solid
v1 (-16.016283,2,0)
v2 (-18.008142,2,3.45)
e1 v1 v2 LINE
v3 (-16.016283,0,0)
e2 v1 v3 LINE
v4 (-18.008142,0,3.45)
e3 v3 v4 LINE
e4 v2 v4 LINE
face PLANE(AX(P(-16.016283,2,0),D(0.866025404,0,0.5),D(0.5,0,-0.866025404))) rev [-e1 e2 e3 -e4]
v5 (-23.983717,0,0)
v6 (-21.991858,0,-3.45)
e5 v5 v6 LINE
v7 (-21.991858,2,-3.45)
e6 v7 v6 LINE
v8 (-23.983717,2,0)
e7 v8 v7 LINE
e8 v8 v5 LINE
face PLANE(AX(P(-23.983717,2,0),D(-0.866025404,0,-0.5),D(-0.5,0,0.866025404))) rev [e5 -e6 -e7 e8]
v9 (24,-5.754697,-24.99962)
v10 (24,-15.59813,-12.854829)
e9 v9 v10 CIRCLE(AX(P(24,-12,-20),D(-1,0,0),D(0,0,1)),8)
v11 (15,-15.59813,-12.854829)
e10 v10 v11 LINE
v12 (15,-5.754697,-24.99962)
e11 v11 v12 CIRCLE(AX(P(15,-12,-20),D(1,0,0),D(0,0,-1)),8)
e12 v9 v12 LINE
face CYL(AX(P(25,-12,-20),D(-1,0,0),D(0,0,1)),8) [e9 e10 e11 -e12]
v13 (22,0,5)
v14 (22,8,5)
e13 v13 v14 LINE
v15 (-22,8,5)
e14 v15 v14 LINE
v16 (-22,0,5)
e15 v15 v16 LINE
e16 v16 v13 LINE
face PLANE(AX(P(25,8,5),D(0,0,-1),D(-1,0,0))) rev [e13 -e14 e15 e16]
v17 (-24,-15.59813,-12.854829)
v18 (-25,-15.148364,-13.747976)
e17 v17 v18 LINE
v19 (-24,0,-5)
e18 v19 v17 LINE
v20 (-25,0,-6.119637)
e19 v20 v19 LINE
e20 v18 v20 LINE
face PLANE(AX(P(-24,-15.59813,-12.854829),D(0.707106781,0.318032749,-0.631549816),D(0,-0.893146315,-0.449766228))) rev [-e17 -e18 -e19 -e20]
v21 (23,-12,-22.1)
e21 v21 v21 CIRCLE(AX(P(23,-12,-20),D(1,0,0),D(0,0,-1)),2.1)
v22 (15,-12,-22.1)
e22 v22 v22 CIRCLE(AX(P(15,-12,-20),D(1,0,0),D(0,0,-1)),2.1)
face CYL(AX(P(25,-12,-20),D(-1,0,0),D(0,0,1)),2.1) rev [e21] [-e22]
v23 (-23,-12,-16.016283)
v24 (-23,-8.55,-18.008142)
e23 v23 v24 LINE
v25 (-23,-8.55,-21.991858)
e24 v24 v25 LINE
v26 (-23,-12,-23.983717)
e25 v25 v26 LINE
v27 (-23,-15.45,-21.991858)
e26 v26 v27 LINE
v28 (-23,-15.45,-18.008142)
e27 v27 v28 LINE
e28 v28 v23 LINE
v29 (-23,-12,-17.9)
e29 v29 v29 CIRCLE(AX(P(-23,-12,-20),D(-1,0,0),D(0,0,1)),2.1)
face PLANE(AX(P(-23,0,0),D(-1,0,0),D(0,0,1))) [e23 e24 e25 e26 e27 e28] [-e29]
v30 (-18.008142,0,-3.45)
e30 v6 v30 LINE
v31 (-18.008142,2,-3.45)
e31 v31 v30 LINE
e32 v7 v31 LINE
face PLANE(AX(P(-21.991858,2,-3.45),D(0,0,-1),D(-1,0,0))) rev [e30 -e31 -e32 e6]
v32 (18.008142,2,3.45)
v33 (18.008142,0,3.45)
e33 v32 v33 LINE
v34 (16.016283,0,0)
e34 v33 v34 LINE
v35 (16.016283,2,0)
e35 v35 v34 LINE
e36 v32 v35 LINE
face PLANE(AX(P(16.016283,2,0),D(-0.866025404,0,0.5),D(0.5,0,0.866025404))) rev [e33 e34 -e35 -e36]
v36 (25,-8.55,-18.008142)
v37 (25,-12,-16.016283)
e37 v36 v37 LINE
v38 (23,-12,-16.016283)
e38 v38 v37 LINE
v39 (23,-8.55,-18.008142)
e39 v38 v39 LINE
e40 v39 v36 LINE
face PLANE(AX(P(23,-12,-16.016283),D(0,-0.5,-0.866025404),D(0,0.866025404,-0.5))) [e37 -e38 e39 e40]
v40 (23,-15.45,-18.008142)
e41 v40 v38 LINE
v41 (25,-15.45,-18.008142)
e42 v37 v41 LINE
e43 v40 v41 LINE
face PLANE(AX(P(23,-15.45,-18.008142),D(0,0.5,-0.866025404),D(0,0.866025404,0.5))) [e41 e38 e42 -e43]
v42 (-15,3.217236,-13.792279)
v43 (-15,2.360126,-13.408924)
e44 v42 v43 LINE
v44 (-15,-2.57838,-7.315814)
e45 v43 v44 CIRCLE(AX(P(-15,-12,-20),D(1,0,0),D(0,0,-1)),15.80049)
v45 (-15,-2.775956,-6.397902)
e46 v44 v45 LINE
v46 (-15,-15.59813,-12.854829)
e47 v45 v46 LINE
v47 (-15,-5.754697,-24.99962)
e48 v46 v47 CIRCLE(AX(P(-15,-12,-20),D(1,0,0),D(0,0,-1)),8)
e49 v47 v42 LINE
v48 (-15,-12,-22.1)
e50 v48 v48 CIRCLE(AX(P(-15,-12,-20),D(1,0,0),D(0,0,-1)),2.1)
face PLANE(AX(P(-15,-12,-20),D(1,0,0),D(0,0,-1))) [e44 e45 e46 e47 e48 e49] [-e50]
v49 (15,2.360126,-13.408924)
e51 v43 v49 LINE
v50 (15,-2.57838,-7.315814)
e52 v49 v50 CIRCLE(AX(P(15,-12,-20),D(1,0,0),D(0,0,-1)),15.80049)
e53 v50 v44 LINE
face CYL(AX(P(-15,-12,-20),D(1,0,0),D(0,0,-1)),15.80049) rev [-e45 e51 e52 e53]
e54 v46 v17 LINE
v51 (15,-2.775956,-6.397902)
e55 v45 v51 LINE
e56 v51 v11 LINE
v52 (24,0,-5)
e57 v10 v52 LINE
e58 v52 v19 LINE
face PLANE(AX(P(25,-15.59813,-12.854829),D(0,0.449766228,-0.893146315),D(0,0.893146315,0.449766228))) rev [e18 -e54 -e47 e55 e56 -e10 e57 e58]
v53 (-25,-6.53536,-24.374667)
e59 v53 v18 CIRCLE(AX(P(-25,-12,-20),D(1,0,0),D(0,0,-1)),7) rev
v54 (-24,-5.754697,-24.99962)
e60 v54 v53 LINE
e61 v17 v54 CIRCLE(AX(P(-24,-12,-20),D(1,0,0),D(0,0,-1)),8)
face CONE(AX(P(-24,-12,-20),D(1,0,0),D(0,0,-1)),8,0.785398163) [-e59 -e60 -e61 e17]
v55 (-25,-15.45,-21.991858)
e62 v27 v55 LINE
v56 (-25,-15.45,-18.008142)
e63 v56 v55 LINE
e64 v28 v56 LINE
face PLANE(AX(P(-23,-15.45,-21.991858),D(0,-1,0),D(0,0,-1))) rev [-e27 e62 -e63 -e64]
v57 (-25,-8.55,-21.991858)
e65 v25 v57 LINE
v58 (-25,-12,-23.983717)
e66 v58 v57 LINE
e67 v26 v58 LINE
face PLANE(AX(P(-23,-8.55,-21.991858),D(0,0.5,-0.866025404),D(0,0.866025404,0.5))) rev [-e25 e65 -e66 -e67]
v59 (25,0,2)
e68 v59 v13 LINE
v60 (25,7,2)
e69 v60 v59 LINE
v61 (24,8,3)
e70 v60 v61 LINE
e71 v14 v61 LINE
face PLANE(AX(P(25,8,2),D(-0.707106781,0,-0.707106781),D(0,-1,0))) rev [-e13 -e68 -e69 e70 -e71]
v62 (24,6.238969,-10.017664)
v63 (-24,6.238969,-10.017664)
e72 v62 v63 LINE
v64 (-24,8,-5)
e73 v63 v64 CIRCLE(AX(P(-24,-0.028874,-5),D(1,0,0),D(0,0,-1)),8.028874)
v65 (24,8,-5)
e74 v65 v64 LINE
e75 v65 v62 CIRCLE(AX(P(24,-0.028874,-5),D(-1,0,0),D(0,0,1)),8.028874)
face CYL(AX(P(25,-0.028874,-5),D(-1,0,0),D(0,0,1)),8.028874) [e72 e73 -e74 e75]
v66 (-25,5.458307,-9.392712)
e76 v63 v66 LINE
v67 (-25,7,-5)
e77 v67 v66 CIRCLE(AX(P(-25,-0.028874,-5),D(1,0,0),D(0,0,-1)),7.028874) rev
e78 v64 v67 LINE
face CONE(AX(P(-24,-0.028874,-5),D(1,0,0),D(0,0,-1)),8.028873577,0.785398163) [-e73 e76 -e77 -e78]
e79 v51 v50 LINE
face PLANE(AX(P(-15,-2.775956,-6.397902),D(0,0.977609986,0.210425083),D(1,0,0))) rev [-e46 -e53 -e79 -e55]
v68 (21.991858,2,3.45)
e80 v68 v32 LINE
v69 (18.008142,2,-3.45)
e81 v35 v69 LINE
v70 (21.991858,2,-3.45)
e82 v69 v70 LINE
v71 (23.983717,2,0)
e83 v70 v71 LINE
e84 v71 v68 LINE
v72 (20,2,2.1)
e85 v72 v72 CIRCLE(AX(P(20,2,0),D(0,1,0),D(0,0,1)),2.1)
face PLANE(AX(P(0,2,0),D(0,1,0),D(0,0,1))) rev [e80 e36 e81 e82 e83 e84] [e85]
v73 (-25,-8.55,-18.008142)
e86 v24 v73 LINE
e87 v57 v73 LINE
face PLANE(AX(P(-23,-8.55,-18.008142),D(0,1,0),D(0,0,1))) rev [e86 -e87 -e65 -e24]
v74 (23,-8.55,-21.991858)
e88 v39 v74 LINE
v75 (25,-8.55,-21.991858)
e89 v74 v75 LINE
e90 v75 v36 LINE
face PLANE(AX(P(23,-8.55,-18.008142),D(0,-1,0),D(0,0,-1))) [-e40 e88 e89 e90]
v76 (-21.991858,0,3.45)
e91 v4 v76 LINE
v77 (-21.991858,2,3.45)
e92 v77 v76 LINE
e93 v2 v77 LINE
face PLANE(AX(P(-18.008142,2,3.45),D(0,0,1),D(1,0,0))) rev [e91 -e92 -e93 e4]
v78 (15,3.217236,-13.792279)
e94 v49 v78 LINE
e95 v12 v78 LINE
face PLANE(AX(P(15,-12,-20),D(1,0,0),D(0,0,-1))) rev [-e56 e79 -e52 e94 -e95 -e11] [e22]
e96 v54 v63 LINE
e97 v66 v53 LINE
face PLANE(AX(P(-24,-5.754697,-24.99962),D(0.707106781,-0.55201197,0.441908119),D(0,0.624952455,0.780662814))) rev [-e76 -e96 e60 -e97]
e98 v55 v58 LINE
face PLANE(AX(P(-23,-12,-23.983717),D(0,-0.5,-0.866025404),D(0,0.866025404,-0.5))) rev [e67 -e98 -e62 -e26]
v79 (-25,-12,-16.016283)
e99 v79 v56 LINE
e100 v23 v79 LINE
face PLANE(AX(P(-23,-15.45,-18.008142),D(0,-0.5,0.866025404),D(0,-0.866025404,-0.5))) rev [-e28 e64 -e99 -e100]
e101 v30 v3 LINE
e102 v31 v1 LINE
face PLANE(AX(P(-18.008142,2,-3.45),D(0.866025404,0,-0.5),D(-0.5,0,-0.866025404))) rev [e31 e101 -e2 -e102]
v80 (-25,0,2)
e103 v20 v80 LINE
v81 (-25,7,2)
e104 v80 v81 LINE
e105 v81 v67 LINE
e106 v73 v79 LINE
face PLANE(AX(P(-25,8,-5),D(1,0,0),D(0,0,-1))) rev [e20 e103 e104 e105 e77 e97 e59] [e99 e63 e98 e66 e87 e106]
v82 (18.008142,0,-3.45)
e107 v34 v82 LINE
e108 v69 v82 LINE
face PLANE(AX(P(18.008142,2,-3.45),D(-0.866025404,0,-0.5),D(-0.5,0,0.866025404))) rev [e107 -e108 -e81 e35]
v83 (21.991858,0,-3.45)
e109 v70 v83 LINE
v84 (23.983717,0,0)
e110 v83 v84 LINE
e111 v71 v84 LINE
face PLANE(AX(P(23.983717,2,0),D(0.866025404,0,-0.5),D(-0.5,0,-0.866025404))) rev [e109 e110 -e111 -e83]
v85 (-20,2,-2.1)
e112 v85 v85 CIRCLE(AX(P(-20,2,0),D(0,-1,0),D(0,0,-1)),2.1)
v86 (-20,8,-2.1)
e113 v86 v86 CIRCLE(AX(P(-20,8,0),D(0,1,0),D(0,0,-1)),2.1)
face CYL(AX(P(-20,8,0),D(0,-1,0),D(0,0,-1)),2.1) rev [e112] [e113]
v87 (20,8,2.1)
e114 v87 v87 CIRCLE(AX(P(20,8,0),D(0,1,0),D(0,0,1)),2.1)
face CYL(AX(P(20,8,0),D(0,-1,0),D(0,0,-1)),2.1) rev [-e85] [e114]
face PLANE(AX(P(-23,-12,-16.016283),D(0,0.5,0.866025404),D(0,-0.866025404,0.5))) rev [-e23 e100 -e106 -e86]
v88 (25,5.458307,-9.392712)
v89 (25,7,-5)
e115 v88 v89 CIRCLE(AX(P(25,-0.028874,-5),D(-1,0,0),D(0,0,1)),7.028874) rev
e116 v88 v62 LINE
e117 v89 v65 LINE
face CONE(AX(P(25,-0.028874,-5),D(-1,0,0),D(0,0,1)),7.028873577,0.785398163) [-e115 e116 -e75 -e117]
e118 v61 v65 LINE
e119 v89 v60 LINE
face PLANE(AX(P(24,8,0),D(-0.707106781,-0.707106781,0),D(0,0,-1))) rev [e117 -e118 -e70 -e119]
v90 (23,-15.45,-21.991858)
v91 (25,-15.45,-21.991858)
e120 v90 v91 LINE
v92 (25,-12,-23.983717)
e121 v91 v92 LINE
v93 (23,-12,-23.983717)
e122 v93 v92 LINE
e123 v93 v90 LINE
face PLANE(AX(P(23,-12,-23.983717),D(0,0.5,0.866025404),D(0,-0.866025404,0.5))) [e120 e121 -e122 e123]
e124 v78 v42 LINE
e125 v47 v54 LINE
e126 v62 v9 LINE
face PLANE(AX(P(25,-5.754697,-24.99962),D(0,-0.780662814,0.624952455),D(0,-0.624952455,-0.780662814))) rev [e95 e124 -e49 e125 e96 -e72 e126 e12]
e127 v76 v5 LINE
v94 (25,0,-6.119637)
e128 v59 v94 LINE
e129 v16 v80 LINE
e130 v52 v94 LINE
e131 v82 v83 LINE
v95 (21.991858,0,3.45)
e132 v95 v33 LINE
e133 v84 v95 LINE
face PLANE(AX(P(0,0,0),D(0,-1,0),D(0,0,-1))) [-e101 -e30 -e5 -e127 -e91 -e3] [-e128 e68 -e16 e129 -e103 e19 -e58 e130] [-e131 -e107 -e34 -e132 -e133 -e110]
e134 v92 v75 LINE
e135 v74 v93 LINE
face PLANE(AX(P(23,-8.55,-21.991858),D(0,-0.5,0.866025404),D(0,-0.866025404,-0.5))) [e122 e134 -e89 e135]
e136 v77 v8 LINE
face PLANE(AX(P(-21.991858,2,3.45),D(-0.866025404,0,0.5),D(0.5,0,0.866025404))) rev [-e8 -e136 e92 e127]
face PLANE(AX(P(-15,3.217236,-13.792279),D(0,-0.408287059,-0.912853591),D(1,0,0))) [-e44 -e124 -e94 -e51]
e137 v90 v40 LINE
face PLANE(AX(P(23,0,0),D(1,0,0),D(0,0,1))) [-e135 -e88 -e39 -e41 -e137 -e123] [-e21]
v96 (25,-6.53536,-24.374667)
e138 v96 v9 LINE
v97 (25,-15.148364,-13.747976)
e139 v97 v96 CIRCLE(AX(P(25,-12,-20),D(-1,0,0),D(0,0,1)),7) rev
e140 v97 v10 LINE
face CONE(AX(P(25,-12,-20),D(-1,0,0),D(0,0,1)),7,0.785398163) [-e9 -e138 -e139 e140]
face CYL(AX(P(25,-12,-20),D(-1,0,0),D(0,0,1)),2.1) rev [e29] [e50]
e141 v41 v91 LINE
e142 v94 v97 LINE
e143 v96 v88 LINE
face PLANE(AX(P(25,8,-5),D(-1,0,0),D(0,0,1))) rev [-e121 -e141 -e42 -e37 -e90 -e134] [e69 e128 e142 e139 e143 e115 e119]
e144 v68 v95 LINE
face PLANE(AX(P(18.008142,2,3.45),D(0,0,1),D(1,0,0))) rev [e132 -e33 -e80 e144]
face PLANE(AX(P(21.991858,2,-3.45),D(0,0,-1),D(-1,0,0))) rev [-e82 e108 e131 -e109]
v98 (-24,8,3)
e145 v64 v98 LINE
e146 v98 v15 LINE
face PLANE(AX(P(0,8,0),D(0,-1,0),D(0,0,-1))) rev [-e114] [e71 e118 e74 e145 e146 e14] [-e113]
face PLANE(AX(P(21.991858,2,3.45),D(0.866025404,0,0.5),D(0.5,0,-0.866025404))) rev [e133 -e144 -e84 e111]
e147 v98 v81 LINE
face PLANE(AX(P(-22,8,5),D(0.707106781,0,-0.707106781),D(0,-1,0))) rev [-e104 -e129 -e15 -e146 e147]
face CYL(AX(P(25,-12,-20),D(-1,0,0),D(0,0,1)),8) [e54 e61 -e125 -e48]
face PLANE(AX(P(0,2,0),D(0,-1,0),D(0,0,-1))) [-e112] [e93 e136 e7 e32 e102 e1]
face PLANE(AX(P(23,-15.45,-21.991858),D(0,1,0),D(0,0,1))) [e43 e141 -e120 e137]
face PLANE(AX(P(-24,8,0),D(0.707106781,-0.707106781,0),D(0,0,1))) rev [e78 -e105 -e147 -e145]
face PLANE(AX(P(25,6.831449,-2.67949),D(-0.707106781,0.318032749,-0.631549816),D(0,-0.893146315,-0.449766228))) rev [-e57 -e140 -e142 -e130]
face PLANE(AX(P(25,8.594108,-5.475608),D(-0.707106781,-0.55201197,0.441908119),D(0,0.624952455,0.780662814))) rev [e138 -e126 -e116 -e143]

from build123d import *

# Parameters (mm, degrees)
CROQUIS1_W              = 50
CROQUIS1_H              = 10
CROQUIS1_R              = 2.1
SALIENTE_EXTRUIR1_DEPTH = 8
CROQUIS4_R              = 2.1
SALIENTE_EXTRUIR2_DEPTH = 25
CROQUIS5_R              = 15.800490208
CORTAR_EXTRUIR1_DEPTH   = 15
CORTAR_EXTRUIR2_DEPTH   = 2
CHAFL_N1_SIZE           = 3
CORTAR_EXTRUIR3_DEPTH   = 2
CHAFL_N2_SIZE           = 1
CHAFL_N2_SIZE_2         = 0.730640075


with BuildPart() as part:
    # Croquis1 → Saliente-Extruir1 (new body)
    with BuildSketch(Plane(origin=(0, 0, 0), x_dir=(1, 0, 0), z_dir=(0, 1, 0))):
        Rectangle(CROQUIS1_W, CROQUIS1_H)
        with Locations(Location((20, 0, 0), (0, 0, 270))):
            Circle(CROQUIS1_R, mode=Mode.SUBTRACT)
        with Locations(Location((-20, 0, 0), (0, 0, 90))):
            Circle(CROQUIS1_R, mode=Mode.SUBTRACT)
    extrude(amount=SALIENTE_EXTRUIR1_DEPTH)

    # Croquis4 → Saliente-Extruir2 (add, symmetric)
    with BuildSketch(Plane(origin=(0, 0, 0), x_dir=(0, 0, -1), z_dir=(1, 0, 0))):
        with BuildLine():
            Line((5, 8), (5, 0))
            Line((5, 0), (12.854829477, -15.59812982))
            ThreePointArc((12.854829477, -15.59812982), (25.037274777, -18.214970863), (24.999619637, -5.754697487))
            Line((24.999619637, -5.754697487), (10.01766425, 6.238969464))
            ThreePointArc((10.01766425, 6.238969464), (7.658861743, 7.54696071), (5, 8))
        make_face()
        with Locations((20, -12)):
            Circle(CROQUIS4_R, mode=Mode.SUBTRACT)
    extrude(amount=SALIENTE_EXTRUIR2_DEPTH, both=True)

    # Croquis5 → Cortar-Extruir1 (cut, symmetric)
    with BuildSketch(Plane(origin=(0, 0, 0), x_dir=(0, 0, -1), z_dir=(1, 0, 0))):
        with Locations((20, -12)):
            Circle(CROQUIS5_R)
    extrude(amount=CORTAR_EXTRUIR1_DEPTH, both=True, mode=Mode.SUBTRACT)

    # Croquis6 → Cortar-Extruir2 (cut, symmetric)
    with BuildSketch(Plane.ZY.offset(25)):
        Polygon((-16.016283143, -12), (-18.008141571, -8.55), (-21.991858429, -8.55), (-23.983716857, -12), (-21.991858429, -15.45), (-18.008141571, -15.45), align=None)
    cortar_extruir2 = extrude(amount=CORTAR_EXTRUIR2_DEPTH, both=True, mode=Mode.SUBTRACT)

    # Simetría1: Cortar-Extruir2 across plane
    add(cortar_extruir2.mirror(Plane(origin=(0, 0, 0), x_dir=(0, 0, 1), z_dir=(1, 0, 0))), mode=Mode.SUBTRACT)

    # Chaflán1
    chafl_n1_edges = [part.edges().sort_by_distance(p)[0] for p in [
        (25, 4, 5),
        (-25, 4, 5),
    ]]
    chamfer(chafl_n1_edges, length=CHAFL_N1_SIZE)

    # Croquis7 → Cortar-Extruir3 (cut, symmetric)
    with BuildSketch(Plane.XZ):
        Polygon((-16.016283143, 0), (-18.008141571, 3.45), (-21.991858429, 3.45), (-23.983716857, 0), (-21.991858429, -3.45), (-18.008141571, -3.45), align=None)
        Polygon((18.008141571, -3.45), (16.016283143, 0), (18.008141571, 3.45), (21.991858429, 3.45), (23.983716857, 0), (21.991858429, -3.45), align=None)
    extrude(amount=CORTAR_EXTRUIR3_DEPTH, both=True, mode=Mode.SUBTRACT)

    # Chaflán2
    # the kernel refuses this chamfer: 1, 0.730640075 mm, written as the material it takes off along each edge
    with BuildSketch(Plane(origin=(25, 8, -5), x_dir=(0, -1, 0), z_dir=(0, 0, 1))) as chafl_n2_piece_1:
        Polygon((CHAFL_N2_SIZE, 0), (0, -CHAFL_N2_SIZE), (0, 0), align=None)
    extrude(amount=9.571682988, mode=Mode.SUBTRACT)
    with BuildSketch(Plane(origin=(-25, 8, 4.571682988), x_dir=(1, 0, 0), z_dir=(0, 0, -1))) as chafl_n2_piece_2:
        Polygon((CHAFL_N2_SIZE, 0), (0, CHAFL_N2_SIZE), (0, 0), align=None)
    extrude(amount=9.571682988, mode=Mode.SUBTRACT)
    with BuildSketch(Plane(origin=(25, -12, -20), x_dir=(0, -0.44976622750296646, 0.8931463153357069), z_dir=(0, 0.8931463153357069, 0.44976622750296646))) as chafl_n2_piece_3:
        Polygon((8 - CHAFL_N2_SIZE, 0), (8, -CHAFL_N2_SIZE), (8, 0), align=None)
    revolve(axis=Axis((25, -12, -20), (1, 0, 0)), revolution_arc=204.592615825, mode=Mode.SUBTRACT)
    with BuildSketch(Plane(origin=(25, -5.754697487, -24.999619637), x_dir=(0, -0.7806628141857404, 0.6249524546296304), z_dir=(0, 0.6249524546296304, 0.7806628141857404)), Plane(origin=(-25, -5.754697487, -24.999619637), x_dir=(1, 0, 0), z_dir=(0, 0.6249524546296304, 0.7806628141857404))) as chafl_n2_piece_4:
        Polygon((CHAFL_N2_SIZE, 0), (0, -CHAFL_N2_SIZE), (0, 0), align=None)
    extrude(amount=19.191327055, mode=Mode.SUBTRACT)
    with BuildSketch(Plane(origin=(25, -0.028873577, -5), x_dir=(0, 0.7806628141857421, -0.6249524546296281), z_dir=(0, -0.6249524546296281, -0.7806628141857421))) as chafl_n2_piece_5:
        Polygon((8.028873577 - CHAFL_N2_SIZE, 0), (8.028873577, -CHAFL_N2_SIZE), (8.028873577, 0), align=None)
    revolve(axis=Axis((25, -0.028873577, -5), (1, 0, 0)), revolution_arc=38.678697835, mode=Mode.SUBTRACT)
    with BuildSketch(Plane(origin=(25, 2.296889185, -3.843343844), x_dir=(0, 0.44976622750296674, -0.8931463153357067), z_dir=(0, -0.8931463153357067, -0.44976622750296674))) as chafl_n2_piece_6_section:
        Polygon((CHAFL_N2_SIZE, 0), (0, -CHAFL_N2_SIZE), (0, 0), align=None)
    chafl_n2_piece_6 = extrude(amount=20.035932185, mode=Mode.PRIVATE)
    chafl_n2_piece_6 = split(chafl_n2_piece_6, bisect_by=Plane(origin=(25, 0, -3.843343844), z_dir=(0, -1, 0)), keep=Keep.TOP, mode=Mode.PRIVATE)
    add(chafl_n2_piece_6, mode=Mode.SUBTRACT)
    with BuildSketch(Plane(origin=(-25, -12, -20), x_dir=(0, -0.44976622750296646, 0.8931463153357069), z_dir=(0, 0.8931463153357069, 0.44976622750296646))) as chafl_n2_piece_7:
        Polygon((8 - CHAFL_N2_SIZE, 0), (8, CHAFL_N2_SIZE), (8, 0), align=None)
    revolve(axis=Axis((-25, -12, -20), (1, 0, 0)), revolution_arc=204.592615825, mode=Mode.SUBTRACT)
    with BuildSketch(Plane(origin=(-25, -0.028873577, -5), x_dir=(0, 0.7806628141857421, -0.6249524546296281), z_dir=(0, -0.6249524546296281, -0.7806628141857421))) as chafl_n2_piece_8:
        Polygon((8.028873577, CHAFL_N2_SIZE), (8.028873577 - CHAFL_N2_SIZE, 0), (8.028873577, 0), align=None)
    revolve(axis=Axis((-25, -0.028873577, -5), (1, 0, 0)), revolution_arc=38.678697835, mode=Mode.SUBTRACT)
    with BuildSketch(Plane(origin=(-25, 2.296889185, -3.843343844), x_dir=(1, 0, 0), z_dir=(0, -0.8931463153357067, -0.44976622750296674))) as chafl_n2_piece_9_section:
        Polygon((CHAFL_N2_SIZE, 0), (0, -CHAFL_N2_SIZE), (0, 0), align=None)
    chafl_n2_piece_9 = extrude(amount=20.035932185, mode=Mode.PRIVATE)
    chafl_n2_piece_9 = split(chafl_n2_piece_9, bisect_by=Plane(origin=(-25, 0, -3.843343844), z_dir=(0, -1, 0)), keep=Keep.TOP, mode=Mode.PRIVATE)
    add(chafl_n2_piece_9, mode=Mode.SUBTRACT)
    with BuildSketch(Plane(origin=(-15, -3.428524041, -6.72651927), x_dir=(0, 0.8931463153357074, 0.44976622750296513), z_dir=(1, 0, 0))) as chafl_n2_piece_10:
        with BuildLine():
            Line((CHAFL_N2_SIZE_2, 0), (0.494257976, -0.908692648))
            ThreePointArc((0.494257976, -0.908692648), (0.261545908, -0.46314506), (0, 0))
            Line((0, 0), (CHAFL_N2_SIZE_2, 0))
        make_face()
    extrude(amount=30, mode=Mode.SUBTRACT)
    with BuildSketch(Plane(origin=(-15, 2.760620634, -14.362662924), x_dir=(0, 0.6249524546296293, 0.7806628141857411), z_dir=(1, 0, 0))) as chafl_n2_piece_11:
        with BuildLine():
            Line((CHAFL_N2_SIZE_2, 0), (0.494257976, 0.908692648))
            ThreePointArc((0.494257976, 0.908692648), (0.261545908, 0.46314506), (0, 0))
            Line((0, 0), (CHAFL_N2_SIZE_2, 0))
        make_face()
    extrude(amount=30, mode=Mode.SUBTRACT)


solid = part.part
